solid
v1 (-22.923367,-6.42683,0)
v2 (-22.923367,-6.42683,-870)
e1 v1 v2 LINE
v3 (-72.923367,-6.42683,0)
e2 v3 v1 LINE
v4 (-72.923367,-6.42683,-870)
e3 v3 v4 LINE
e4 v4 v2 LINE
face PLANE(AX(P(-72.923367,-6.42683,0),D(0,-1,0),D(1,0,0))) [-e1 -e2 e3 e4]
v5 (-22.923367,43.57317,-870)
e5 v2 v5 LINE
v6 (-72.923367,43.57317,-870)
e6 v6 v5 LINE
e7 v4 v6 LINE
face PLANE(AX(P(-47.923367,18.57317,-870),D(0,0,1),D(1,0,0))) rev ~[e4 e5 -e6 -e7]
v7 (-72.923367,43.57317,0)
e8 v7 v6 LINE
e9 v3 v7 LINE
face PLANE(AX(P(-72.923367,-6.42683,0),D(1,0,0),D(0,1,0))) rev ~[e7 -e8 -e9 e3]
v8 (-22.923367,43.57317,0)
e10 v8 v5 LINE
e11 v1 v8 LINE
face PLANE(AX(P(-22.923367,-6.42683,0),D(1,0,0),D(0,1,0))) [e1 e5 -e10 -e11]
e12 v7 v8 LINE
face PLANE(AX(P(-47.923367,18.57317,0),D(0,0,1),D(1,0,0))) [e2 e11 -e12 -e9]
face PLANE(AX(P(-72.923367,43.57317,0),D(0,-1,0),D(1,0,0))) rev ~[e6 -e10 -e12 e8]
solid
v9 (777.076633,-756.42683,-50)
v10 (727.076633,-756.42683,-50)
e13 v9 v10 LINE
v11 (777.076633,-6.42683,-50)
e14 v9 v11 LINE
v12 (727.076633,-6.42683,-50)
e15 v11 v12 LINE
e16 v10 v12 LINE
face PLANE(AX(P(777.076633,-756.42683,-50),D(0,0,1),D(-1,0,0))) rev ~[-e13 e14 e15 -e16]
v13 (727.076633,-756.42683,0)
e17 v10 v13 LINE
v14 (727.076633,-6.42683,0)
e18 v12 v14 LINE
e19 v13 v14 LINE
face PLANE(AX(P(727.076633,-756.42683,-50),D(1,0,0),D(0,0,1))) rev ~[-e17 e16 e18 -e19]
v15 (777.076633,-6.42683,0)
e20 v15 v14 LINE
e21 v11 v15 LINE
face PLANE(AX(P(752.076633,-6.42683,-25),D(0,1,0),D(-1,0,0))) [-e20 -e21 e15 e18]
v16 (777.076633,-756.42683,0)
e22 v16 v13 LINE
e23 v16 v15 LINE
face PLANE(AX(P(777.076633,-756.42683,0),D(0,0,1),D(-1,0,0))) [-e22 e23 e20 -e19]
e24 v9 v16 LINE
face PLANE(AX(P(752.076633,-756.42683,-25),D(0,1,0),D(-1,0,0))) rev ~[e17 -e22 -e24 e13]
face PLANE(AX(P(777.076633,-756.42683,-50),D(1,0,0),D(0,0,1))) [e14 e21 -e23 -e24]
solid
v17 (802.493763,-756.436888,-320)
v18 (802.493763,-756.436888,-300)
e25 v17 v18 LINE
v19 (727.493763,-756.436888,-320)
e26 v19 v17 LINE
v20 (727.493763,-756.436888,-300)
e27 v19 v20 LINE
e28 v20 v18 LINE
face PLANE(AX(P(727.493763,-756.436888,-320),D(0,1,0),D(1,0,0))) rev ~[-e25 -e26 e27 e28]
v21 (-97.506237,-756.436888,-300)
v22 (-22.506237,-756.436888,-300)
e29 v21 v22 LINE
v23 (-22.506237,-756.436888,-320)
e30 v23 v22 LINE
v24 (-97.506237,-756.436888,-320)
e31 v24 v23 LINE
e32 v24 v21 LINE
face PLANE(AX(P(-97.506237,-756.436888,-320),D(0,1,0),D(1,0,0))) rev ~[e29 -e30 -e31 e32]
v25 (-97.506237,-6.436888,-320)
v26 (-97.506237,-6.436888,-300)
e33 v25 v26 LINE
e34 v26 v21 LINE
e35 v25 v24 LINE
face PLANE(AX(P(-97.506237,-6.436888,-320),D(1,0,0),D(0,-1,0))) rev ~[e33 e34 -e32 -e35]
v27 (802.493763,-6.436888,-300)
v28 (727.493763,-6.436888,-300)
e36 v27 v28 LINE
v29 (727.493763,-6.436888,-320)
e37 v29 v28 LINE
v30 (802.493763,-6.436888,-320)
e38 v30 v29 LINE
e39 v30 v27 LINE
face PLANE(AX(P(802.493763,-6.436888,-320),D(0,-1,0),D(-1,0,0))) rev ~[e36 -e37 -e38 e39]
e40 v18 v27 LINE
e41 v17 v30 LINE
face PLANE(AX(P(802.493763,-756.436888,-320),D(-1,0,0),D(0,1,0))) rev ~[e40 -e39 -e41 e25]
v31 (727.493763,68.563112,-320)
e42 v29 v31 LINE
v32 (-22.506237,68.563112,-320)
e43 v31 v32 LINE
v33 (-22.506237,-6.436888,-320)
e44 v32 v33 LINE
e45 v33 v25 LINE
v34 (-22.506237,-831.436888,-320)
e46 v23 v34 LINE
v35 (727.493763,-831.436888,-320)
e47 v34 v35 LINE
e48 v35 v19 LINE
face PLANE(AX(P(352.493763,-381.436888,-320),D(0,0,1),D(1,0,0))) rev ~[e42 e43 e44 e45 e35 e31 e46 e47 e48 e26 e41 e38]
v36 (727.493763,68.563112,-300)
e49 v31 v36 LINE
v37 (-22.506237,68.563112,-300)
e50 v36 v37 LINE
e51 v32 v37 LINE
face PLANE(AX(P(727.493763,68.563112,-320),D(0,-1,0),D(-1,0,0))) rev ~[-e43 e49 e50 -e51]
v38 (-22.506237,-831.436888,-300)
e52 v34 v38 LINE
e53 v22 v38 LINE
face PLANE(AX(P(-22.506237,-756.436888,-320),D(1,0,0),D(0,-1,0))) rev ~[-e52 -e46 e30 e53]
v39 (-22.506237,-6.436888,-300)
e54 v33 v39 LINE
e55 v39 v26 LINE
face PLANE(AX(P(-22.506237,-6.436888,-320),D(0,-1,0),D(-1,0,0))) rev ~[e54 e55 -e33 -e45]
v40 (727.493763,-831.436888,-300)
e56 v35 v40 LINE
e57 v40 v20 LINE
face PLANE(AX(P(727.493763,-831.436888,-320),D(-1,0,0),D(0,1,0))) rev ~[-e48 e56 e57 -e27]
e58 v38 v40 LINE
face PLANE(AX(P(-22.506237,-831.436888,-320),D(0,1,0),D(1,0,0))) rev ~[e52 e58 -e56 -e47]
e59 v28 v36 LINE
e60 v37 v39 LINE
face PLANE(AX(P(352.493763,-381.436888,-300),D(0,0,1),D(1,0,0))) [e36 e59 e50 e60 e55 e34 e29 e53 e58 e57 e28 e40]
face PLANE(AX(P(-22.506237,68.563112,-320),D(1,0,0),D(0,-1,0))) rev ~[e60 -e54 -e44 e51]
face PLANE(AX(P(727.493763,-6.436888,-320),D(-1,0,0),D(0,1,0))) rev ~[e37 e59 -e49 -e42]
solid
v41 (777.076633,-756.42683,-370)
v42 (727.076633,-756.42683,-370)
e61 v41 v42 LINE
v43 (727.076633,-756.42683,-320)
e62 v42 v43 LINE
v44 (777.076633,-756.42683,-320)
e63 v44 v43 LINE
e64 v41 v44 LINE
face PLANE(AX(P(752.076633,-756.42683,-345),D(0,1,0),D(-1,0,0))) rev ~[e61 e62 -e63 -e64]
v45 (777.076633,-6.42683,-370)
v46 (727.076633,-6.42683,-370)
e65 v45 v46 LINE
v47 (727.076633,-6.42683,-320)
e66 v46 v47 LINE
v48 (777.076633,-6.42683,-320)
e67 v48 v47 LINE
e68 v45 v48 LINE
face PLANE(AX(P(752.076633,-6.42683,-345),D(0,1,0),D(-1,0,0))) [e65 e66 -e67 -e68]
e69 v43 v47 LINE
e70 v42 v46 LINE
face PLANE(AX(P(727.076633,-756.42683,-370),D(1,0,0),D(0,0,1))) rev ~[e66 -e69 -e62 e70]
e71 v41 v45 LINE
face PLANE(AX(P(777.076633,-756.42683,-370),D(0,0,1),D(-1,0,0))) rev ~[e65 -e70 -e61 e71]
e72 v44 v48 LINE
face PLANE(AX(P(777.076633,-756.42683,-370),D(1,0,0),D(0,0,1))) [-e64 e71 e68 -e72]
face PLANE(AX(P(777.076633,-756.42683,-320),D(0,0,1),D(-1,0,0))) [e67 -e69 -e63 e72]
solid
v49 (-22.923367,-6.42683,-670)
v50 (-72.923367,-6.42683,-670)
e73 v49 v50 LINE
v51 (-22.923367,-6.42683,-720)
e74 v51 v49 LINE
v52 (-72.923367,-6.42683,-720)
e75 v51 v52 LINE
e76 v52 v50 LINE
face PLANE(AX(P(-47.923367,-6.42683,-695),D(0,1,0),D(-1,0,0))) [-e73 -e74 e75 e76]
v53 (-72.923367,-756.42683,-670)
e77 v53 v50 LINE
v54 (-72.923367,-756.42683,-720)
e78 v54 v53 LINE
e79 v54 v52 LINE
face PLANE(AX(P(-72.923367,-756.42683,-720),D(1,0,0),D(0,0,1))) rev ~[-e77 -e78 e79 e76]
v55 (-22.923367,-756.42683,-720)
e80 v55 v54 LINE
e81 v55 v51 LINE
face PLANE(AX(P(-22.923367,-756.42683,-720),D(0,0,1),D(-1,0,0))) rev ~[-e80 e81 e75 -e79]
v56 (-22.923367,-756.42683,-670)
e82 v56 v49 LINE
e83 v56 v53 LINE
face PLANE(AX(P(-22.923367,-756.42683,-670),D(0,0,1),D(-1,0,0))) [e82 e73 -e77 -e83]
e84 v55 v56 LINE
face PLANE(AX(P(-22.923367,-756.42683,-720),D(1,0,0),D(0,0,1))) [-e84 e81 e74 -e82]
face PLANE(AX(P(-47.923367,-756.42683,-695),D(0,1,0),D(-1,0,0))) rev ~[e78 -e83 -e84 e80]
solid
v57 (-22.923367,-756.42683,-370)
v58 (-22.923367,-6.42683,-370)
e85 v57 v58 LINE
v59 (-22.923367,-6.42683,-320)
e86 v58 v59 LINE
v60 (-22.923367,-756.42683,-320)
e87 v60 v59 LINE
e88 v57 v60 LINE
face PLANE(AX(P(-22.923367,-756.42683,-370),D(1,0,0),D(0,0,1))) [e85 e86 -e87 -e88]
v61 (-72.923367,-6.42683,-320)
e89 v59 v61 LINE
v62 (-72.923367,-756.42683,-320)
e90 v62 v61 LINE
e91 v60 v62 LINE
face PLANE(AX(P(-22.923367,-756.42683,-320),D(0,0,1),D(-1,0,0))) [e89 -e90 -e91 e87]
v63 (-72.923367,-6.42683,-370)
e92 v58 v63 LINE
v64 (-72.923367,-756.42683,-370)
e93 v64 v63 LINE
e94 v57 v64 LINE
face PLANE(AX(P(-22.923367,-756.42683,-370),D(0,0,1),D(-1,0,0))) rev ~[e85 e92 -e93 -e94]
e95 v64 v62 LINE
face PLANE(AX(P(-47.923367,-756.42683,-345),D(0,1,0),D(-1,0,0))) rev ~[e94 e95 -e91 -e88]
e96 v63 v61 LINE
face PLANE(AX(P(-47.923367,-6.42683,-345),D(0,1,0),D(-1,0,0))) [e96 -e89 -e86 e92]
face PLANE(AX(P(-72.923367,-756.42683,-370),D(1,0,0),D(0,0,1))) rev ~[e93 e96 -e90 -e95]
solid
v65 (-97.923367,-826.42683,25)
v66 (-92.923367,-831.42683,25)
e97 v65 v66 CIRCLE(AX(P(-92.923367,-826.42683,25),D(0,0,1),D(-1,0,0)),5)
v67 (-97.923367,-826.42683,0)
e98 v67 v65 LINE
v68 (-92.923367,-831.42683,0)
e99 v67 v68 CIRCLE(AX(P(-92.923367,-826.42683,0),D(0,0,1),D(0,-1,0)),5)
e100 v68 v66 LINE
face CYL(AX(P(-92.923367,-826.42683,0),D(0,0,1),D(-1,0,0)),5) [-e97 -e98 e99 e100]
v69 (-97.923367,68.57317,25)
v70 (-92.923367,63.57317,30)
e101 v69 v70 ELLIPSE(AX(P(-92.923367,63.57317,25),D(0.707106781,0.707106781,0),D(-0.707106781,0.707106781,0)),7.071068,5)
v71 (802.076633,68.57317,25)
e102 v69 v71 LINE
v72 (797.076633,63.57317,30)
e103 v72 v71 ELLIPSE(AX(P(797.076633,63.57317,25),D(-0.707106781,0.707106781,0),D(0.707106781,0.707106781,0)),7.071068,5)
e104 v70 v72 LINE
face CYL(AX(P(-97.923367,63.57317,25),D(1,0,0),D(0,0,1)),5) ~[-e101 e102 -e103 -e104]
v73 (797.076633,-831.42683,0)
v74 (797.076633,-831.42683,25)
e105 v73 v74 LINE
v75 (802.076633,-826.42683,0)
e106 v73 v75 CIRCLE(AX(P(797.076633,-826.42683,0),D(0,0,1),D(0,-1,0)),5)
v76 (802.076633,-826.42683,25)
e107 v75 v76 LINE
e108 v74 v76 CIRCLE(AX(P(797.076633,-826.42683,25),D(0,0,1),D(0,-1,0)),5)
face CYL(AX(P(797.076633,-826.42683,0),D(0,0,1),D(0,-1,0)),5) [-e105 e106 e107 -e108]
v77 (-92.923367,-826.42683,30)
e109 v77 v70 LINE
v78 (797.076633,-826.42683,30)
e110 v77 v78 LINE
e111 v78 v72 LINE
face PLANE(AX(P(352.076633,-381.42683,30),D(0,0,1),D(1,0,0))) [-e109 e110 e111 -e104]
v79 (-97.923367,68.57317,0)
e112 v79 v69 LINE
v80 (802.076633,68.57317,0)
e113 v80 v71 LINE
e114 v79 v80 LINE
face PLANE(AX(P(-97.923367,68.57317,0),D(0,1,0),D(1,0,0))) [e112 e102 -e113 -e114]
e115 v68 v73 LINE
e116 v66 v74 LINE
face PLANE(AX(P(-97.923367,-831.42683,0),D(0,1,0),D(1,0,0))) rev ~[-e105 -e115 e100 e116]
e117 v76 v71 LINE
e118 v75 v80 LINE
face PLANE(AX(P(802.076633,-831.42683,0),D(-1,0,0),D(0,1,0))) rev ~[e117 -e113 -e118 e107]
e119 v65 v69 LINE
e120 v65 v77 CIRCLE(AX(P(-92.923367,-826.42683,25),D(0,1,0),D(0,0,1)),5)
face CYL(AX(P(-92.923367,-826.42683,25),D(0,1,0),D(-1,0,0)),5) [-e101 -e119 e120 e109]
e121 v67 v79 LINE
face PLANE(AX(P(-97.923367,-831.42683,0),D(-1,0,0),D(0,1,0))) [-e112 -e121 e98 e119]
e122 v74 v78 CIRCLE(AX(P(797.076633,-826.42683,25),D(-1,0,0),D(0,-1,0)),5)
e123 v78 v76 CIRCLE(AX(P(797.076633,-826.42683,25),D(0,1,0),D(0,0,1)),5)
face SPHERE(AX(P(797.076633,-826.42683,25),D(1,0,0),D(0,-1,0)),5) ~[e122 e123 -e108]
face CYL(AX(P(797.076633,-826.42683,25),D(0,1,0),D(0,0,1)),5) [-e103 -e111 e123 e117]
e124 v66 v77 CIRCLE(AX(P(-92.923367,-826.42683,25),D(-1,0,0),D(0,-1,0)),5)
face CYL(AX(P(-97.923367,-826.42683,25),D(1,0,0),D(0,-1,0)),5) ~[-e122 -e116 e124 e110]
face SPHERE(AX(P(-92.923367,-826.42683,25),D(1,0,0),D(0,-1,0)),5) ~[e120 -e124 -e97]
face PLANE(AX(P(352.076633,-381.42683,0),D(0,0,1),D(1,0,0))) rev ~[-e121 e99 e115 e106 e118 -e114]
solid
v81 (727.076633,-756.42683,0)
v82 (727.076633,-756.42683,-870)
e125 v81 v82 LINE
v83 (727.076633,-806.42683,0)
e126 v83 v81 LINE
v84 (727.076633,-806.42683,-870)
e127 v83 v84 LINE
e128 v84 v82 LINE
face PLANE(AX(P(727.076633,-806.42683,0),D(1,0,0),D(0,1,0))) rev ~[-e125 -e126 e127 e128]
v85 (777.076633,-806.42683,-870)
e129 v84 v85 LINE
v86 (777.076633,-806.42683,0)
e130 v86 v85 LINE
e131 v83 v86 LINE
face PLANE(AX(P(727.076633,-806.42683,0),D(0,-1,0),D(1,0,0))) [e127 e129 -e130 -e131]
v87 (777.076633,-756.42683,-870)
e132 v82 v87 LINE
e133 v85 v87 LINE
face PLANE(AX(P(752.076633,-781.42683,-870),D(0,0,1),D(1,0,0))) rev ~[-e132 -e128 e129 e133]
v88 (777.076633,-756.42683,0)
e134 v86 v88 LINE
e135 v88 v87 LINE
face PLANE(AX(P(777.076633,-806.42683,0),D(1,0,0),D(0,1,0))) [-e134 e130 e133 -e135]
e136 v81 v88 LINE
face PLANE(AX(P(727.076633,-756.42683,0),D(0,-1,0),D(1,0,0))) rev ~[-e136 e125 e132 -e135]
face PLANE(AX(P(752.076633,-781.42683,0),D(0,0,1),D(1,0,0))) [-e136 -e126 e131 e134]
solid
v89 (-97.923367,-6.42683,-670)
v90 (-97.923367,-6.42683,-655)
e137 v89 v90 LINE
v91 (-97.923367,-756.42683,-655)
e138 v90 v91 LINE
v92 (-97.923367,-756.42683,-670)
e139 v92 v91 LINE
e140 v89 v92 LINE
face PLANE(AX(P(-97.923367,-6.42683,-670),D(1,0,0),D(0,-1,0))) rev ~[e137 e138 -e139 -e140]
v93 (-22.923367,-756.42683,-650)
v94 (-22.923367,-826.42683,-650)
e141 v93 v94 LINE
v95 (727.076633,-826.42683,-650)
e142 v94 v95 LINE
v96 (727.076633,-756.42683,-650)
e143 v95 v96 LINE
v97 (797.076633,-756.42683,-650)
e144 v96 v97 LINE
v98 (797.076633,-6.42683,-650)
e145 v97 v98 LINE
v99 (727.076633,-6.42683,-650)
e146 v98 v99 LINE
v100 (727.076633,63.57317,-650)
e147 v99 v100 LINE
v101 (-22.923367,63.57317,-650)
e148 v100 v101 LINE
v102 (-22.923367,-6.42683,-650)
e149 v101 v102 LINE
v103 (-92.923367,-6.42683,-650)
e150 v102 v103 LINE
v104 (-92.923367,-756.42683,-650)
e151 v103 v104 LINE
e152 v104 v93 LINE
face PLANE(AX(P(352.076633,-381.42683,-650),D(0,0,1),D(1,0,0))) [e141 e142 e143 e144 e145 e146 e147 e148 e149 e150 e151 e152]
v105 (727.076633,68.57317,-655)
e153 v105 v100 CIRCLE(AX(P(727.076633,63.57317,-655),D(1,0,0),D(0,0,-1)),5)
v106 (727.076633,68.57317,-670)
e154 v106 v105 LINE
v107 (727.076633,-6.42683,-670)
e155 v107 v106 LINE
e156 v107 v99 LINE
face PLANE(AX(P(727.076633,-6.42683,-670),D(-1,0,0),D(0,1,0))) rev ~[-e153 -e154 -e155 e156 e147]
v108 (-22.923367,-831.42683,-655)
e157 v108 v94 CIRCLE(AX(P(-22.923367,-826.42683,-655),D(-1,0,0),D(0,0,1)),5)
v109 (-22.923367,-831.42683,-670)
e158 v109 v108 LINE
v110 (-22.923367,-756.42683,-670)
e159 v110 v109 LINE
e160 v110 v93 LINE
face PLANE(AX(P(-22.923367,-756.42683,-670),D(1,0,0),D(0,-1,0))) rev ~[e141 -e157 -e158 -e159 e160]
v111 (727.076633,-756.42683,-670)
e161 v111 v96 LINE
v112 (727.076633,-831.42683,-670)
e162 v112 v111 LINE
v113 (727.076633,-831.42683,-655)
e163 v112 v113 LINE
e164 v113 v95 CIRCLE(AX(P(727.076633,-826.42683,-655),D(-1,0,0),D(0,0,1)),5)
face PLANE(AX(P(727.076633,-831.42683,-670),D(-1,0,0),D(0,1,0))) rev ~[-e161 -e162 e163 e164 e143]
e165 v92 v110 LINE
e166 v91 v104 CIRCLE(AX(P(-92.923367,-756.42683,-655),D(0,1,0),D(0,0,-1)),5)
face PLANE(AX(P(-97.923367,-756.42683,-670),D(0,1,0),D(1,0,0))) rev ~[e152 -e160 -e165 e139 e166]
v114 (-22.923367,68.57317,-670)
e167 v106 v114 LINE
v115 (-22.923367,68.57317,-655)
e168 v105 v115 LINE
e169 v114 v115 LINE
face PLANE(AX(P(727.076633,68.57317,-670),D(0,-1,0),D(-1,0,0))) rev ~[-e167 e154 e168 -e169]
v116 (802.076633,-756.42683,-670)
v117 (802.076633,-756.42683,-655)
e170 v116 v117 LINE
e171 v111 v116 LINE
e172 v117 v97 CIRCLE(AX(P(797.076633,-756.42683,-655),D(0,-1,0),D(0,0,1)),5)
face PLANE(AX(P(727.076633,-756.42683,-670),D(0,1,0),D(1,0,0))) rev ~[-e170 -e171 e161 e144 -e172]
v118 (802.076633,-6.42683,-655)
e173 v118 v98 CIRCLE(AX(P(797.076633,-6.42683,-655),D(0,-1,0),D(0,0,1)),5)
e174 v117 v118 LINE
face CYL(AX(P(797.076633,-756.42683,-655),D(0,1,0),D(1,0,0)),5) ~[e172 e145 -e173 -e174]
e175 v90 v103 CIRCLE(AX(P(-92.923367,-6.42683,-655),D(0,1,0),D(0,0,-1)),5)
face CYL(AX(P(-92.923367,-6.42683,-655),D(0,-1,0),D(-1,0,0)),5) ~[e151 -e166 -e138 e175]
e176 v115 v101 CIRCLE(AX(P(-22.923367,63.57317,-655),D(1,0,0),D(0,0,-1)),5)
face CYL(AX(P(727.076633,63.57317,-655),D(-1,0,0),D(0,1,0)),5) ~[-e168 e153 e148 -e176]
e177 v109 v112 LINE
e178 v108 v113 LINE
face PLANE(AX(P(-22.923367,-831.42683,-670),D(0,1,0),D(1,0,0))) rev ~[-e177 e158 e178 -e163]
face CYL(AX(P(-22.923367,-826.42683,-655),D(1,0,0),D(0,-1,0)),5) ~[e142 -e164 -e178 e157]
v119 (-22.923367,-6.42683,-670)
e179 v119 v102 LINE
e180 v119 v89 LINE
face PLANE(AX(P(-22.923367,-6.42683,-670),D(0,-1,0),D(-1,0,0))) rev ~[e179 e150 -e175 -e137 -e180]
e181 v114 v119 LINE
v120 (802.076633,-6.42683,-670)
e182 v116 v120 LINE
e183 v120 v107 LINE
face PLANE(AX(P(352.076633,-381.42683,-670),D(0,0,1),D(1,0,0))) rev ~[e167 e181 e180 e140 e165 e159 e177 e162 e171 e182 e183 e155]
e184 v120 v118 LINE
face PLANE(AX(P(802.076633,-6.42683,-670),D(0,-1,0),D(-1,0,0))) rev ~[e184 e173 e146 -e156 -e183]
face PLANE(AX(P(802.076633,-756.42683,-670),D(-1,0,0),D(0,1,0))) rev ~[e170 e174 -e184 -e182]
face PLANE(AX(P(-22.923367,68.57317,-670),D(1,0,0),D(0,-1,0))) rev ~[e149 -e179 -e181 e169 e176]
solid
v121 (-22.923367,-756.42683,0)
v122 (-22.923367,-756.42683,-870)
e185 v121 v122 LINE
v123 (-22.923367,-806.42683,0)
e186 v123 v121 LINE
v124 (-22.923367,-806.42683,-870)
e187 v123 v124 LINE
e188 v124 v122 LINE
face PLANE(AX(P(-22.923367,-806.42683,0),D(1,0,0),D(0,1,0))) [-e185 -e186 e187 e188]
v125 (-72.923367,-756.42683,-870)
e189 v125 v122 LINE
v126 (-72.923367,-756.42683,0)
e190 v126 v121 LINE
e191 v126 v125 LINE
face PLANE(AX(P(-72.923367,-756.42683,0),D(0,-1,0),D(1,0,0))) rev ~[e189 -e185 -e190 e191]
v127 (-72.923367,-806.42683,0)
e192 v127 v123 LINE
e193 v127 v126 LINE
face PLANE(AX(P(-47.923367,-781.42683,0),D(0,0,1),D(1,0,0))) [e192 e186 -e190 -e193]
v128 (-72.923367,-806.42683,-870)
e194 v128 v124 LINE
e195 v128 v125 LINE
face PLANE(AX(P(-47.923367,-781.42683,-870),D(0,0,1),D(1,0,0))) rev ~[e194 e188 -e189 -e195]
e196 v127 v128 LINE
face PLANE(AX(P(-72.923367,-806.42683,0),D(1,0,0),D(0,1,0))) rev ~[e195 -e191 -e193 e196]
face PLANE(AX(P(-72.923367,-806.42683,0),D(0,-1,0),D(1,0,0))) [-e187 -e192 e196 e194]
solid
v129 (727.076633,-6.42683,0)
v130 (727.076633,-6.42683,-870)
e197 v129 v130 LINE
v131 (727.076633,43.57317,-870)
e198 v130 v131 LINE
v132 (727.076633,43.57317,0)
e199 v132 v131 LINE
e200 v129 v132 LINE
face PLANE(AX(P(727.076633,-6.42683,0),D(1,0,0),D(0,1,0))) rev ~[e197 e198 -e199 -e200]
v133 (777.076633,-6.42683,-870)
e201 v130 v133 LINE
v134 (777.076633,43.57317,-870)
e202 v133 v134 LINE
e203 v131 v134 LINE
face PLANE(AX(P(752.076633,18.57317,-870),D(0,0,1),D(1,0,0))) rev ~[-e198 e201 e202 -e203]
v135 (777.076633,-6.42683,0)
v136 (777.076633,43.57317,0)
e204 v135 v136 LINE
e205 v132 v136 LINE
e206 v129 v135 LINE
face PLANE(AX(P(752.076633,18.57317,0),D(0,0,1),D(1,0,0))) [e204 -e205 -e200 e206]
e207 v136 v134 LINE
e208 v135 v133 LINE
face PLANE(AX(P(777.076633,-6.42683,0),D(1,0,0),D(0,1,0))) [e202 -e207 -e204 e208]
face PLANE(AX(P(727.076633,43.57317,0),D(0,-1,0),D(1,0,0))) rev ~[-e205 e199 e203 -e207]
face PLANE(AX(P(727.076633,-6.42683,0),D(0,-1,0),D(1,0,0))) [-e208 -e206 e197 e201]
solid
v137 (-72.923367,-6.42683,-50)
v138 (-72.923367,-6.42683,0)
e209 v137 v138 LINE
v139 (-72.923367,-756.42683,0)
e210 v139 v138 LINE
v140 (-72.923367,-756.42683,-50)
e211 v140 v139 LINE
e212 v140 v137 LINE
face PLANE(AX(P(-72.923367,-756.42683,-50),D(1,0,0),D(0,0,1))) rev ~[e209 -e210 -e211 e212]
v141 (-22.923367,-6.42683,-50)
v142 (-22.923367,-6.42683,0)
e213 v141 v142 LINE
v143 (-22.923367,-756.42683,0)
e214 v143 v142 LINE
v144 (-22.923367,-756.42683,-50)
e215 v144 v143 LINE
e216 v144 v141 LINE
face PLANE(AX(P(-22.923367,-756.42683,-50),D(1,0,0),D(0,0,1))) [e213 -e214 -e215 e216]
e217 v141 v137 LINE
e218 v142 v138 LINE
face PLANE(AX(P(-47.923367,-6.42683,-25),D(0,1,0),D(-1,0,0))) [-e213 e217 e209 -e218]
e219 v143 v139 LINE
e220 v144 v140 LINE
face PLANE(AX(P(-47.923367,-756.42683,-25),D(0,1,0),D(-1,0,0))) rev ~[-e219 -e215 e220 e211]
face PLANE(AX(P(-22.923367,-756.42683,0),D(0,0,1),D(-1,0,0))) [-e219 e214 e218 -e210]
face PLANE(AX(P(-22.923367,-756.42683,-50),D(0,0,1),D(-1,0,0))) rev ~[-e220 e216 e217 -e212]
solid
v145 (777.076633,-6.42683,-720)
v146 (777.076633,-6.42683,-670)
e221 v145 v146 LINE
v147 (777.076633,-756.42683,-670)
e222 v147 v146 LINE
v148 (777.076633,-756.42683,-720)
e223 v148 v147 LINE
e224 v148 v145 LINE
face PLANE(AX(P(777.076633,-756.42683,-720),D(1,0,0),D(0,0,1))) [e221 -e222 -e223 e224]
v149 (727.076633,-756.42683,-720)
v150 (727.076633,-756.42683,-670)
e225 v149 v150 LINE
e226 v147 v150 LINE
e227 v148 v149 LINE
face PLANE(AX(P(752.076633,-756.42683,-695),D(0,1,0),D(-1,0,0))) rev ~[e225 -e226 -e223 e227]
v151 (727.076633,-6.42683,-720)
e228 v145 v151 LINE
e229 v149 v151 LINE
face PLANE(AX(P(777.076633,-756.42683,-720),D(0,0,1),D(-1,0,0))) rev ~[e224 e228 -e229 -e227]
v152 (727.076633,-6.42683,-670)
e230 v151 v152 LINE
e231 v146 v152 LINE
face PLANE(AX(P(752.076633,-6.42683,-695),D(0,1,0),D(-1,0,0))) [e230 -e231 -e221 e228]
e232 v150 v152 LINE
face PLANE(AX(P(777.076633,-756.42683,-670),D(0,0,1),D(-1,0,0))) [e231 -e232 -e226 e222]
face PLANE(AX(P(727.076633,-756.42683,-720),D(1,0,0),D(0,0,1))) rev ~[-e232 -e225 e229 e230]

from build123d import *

# Parameters (mm, degrees)
F0_W      = 50
F0_H      = 50
F1_DEPTH  = 870
F4_W      = 900
F4_H      = 900
F5_DEPTH  = 30
F8_DEPTH  = 20
F9_R      = 5
F10_R     = 5
F11_R     = 5
F3_W      = 50
F3_H      = 50
F12_DEPTH = 750
F14_DEPTH = 20


with BuildPart() as f1:
    # F0 (on Top) → F1 (new body)
    with BuildSketch(Plane.XY):
        with Locations((-47.9233672377, -781.426829705)):
            Rectangle(F0_W, F0_H)
    extrude(amount=-F1_DEPTH)


with BuildPart() as f1b:
    # F0 (on Top) → F1, piece 2 (new body)
    with BuildSketch(Plane.XY):
        with Locations((-47.9233672377, 18.573170295)):
            Rectangle(F0_W, F0_H)
    extrude(amount=-F1_DEPTH)


with BuildPart() as f1c:
    # F0 (on Top) → F1, piece 3 (new body)
    with BuildSketch(Plane.XY):
        with Locations((752.0766327623, -781.426829705)):
            Rectangle(F0_W, F0_H)
    extrude(amount=-F1_DEPTH)


with BuildPart() as f1d:
    # F0 (on Top) → F1, piece 4 (new body)
    with BuildSketch(Plane.XY):
        with Locations((752.0766327623, 18.573170295)):
            Rectangle(F0_W, F0_H)
    extrude(amount=-F1_DEPTH)


with BuildPart() as f5:
    # F4 (on face) → F5 (new body)
    with BuildSketch(Plane.XY):
        with Locations((352.0766327623, -381.426829705)):
            Rectangle(F4_W, F4_H)
    extrude(amount=F5_DEPTH)

    # F9
    f9_edges = [f5.edges().sort_by_distance(p)[0] for p in [
        (352.076633, -831.42683, 30),
    ]]
    fillet(f9_edges, radius=F9_R)

    # F10
    f10_edges = [f5.edges().sort_by_distance(p)[0] for p in [
        (802.076633, -378.92683, 30),
        (-97.923367, -378.92683, 30),
        (352.076633, 68.57317, 30),
    ]]
    fillet(f10_edges, radius=F10_R)


with BuildPart() as f8:
    # F7 (on face) → F8 (new body)
    with BuildSketch(Plane.XY.offset(-670)):
        Polygon((727.0766327623, -756.426829705), (802.0766327623, -756.426829705), (802.0766327623, -6.426829705), (727.0766327623, -6.426829705), (727.0766327623, 68.573170295), (-22.9233672377, 68.573170295), (-22.9233672377, -6.426829705), (-97.9233672377, -6.426829705), (-97.9233672377, -756.426829705), (-22.9233672377, -756.426829705), (-22.9233672377, -831.426829705), (727.0766327623, -831.426829705), align=None)
    extrude(amount=F8_DEPTH)

    # F11
    f11_edges = [f8.edges().sort_by_distance(p)[0] for p in [
        (802.076633, -381.42683, -650),
        (352.076633, 68.57317, -650),
        (352.076633, -831.42683, -650),
        (-97.923367, -381.42683, -650),
    ]]
    fillet(f11_edges, radius=F11_R)


with BuildPart() as f12:
    # F3 (on face) → F12 (new body)
    with BuildSketch(Plane(origin=(0, -756.426829705, 0), x_dir=(-1, 0, 0), z_dir=(0, 1, 0))):
        with Locations((-752.0766327623, -695)):
            Rectangle(F3_W, F3_H)
    extrude(amount=F12_DEPTH)


with BuildPart() as f12b:
    # F3 (on face) → F12, piece 2 (new body)
    with BuildSketch(Plane(origin=(0, -756.426829705, 0), x_dir=(-1, 0, 0), z_dir=(0, 1, 0))):
        with Locations((47.9233672377, -695)):
            Rectangle(F3_W, F3_H)
    extrude(amount=F12_DEPTH)


with BuildPart() as f12c:
    # F3 (on face) → F12, piece 3 (new body)
    with BuildSketch(Plane(origin=(0, -756.426829705, 0), x_dir=(-1, 0, 0), z_dir=(0, 1, 0))):
        with Locations((47.9233672377, -25)):
            Rectangle(F3_W, F3_H)
    extrude(amount=F12_DEPTH)


with BuildPart() as f12d:
    # F3 (on face) → F12, piece 4 (new body)
    with BuildSketch(Plane(origin=(0, -756.426829705, 0), x_dir=(-1, 0, 0), z_dir=(0, 1, 0))):
        with Locations((-752.0766327623, -25)):
            Rectangle(F3_W, F3_H)
    extrude(amount=F12_DEPTH)


with BuildPart() as f12e:
    # F3 (on face) → F12, piece 5 (new body)
    with BuildSketch(Plane(origin=(0, -756.426829705, 0), x_dir=(-1, 0, 0), z_dir=(0, 1, 0))):
        with Locations((47.9233672377, -345)):
            Rectangle(F3_W, F3_H)
    extrude(amount=F12_DEPTH)


with BuildPart() as f12f:
    # F3 (on face) → F12, piece 6 (new body)
    with BuildSketch(Plane(origin=(0, -756.426829705, 0), x_dir=(-1, 0, 0), z_dir=(0, 1, 0))):
        with Locations((-752.0766327623, -345)):
            Rectangle(F3_W, F3_H)
    extrude(amount=F12_DEPTH)


with BuildPart() as f14:
    # F13 (on face) → F14 (new body)
    with BuildSketch(Plane.XY.offset(-320)):
        Polygon((727.49376297, -756.4368884079), (802.49376297, -756.4368884079), (802.49376297, -6.4368884079), (727.49376297, -6.4368884079), (727.49376297, 68.5631115921), (-22.50623703, 68.5631115921), (-22.50623703, -6.4368884079), (-97.50623703, -6.4368884079), (-97.50623703, -756.4368884079), (-22.50623703, -756.4368884079), (-22.50623703, -831.4368884079), (727.49376297, -831.4368884079), align=None)
    extrude(amount=F14_DEPTH)


solid = Compound([f1.part, f1b.part, f1c.part, f1d.part, f5.part, f8.part, f12.part, f12b.part, f12c.part, f12d.part, f12e.part, f12f.part, f14.part])
